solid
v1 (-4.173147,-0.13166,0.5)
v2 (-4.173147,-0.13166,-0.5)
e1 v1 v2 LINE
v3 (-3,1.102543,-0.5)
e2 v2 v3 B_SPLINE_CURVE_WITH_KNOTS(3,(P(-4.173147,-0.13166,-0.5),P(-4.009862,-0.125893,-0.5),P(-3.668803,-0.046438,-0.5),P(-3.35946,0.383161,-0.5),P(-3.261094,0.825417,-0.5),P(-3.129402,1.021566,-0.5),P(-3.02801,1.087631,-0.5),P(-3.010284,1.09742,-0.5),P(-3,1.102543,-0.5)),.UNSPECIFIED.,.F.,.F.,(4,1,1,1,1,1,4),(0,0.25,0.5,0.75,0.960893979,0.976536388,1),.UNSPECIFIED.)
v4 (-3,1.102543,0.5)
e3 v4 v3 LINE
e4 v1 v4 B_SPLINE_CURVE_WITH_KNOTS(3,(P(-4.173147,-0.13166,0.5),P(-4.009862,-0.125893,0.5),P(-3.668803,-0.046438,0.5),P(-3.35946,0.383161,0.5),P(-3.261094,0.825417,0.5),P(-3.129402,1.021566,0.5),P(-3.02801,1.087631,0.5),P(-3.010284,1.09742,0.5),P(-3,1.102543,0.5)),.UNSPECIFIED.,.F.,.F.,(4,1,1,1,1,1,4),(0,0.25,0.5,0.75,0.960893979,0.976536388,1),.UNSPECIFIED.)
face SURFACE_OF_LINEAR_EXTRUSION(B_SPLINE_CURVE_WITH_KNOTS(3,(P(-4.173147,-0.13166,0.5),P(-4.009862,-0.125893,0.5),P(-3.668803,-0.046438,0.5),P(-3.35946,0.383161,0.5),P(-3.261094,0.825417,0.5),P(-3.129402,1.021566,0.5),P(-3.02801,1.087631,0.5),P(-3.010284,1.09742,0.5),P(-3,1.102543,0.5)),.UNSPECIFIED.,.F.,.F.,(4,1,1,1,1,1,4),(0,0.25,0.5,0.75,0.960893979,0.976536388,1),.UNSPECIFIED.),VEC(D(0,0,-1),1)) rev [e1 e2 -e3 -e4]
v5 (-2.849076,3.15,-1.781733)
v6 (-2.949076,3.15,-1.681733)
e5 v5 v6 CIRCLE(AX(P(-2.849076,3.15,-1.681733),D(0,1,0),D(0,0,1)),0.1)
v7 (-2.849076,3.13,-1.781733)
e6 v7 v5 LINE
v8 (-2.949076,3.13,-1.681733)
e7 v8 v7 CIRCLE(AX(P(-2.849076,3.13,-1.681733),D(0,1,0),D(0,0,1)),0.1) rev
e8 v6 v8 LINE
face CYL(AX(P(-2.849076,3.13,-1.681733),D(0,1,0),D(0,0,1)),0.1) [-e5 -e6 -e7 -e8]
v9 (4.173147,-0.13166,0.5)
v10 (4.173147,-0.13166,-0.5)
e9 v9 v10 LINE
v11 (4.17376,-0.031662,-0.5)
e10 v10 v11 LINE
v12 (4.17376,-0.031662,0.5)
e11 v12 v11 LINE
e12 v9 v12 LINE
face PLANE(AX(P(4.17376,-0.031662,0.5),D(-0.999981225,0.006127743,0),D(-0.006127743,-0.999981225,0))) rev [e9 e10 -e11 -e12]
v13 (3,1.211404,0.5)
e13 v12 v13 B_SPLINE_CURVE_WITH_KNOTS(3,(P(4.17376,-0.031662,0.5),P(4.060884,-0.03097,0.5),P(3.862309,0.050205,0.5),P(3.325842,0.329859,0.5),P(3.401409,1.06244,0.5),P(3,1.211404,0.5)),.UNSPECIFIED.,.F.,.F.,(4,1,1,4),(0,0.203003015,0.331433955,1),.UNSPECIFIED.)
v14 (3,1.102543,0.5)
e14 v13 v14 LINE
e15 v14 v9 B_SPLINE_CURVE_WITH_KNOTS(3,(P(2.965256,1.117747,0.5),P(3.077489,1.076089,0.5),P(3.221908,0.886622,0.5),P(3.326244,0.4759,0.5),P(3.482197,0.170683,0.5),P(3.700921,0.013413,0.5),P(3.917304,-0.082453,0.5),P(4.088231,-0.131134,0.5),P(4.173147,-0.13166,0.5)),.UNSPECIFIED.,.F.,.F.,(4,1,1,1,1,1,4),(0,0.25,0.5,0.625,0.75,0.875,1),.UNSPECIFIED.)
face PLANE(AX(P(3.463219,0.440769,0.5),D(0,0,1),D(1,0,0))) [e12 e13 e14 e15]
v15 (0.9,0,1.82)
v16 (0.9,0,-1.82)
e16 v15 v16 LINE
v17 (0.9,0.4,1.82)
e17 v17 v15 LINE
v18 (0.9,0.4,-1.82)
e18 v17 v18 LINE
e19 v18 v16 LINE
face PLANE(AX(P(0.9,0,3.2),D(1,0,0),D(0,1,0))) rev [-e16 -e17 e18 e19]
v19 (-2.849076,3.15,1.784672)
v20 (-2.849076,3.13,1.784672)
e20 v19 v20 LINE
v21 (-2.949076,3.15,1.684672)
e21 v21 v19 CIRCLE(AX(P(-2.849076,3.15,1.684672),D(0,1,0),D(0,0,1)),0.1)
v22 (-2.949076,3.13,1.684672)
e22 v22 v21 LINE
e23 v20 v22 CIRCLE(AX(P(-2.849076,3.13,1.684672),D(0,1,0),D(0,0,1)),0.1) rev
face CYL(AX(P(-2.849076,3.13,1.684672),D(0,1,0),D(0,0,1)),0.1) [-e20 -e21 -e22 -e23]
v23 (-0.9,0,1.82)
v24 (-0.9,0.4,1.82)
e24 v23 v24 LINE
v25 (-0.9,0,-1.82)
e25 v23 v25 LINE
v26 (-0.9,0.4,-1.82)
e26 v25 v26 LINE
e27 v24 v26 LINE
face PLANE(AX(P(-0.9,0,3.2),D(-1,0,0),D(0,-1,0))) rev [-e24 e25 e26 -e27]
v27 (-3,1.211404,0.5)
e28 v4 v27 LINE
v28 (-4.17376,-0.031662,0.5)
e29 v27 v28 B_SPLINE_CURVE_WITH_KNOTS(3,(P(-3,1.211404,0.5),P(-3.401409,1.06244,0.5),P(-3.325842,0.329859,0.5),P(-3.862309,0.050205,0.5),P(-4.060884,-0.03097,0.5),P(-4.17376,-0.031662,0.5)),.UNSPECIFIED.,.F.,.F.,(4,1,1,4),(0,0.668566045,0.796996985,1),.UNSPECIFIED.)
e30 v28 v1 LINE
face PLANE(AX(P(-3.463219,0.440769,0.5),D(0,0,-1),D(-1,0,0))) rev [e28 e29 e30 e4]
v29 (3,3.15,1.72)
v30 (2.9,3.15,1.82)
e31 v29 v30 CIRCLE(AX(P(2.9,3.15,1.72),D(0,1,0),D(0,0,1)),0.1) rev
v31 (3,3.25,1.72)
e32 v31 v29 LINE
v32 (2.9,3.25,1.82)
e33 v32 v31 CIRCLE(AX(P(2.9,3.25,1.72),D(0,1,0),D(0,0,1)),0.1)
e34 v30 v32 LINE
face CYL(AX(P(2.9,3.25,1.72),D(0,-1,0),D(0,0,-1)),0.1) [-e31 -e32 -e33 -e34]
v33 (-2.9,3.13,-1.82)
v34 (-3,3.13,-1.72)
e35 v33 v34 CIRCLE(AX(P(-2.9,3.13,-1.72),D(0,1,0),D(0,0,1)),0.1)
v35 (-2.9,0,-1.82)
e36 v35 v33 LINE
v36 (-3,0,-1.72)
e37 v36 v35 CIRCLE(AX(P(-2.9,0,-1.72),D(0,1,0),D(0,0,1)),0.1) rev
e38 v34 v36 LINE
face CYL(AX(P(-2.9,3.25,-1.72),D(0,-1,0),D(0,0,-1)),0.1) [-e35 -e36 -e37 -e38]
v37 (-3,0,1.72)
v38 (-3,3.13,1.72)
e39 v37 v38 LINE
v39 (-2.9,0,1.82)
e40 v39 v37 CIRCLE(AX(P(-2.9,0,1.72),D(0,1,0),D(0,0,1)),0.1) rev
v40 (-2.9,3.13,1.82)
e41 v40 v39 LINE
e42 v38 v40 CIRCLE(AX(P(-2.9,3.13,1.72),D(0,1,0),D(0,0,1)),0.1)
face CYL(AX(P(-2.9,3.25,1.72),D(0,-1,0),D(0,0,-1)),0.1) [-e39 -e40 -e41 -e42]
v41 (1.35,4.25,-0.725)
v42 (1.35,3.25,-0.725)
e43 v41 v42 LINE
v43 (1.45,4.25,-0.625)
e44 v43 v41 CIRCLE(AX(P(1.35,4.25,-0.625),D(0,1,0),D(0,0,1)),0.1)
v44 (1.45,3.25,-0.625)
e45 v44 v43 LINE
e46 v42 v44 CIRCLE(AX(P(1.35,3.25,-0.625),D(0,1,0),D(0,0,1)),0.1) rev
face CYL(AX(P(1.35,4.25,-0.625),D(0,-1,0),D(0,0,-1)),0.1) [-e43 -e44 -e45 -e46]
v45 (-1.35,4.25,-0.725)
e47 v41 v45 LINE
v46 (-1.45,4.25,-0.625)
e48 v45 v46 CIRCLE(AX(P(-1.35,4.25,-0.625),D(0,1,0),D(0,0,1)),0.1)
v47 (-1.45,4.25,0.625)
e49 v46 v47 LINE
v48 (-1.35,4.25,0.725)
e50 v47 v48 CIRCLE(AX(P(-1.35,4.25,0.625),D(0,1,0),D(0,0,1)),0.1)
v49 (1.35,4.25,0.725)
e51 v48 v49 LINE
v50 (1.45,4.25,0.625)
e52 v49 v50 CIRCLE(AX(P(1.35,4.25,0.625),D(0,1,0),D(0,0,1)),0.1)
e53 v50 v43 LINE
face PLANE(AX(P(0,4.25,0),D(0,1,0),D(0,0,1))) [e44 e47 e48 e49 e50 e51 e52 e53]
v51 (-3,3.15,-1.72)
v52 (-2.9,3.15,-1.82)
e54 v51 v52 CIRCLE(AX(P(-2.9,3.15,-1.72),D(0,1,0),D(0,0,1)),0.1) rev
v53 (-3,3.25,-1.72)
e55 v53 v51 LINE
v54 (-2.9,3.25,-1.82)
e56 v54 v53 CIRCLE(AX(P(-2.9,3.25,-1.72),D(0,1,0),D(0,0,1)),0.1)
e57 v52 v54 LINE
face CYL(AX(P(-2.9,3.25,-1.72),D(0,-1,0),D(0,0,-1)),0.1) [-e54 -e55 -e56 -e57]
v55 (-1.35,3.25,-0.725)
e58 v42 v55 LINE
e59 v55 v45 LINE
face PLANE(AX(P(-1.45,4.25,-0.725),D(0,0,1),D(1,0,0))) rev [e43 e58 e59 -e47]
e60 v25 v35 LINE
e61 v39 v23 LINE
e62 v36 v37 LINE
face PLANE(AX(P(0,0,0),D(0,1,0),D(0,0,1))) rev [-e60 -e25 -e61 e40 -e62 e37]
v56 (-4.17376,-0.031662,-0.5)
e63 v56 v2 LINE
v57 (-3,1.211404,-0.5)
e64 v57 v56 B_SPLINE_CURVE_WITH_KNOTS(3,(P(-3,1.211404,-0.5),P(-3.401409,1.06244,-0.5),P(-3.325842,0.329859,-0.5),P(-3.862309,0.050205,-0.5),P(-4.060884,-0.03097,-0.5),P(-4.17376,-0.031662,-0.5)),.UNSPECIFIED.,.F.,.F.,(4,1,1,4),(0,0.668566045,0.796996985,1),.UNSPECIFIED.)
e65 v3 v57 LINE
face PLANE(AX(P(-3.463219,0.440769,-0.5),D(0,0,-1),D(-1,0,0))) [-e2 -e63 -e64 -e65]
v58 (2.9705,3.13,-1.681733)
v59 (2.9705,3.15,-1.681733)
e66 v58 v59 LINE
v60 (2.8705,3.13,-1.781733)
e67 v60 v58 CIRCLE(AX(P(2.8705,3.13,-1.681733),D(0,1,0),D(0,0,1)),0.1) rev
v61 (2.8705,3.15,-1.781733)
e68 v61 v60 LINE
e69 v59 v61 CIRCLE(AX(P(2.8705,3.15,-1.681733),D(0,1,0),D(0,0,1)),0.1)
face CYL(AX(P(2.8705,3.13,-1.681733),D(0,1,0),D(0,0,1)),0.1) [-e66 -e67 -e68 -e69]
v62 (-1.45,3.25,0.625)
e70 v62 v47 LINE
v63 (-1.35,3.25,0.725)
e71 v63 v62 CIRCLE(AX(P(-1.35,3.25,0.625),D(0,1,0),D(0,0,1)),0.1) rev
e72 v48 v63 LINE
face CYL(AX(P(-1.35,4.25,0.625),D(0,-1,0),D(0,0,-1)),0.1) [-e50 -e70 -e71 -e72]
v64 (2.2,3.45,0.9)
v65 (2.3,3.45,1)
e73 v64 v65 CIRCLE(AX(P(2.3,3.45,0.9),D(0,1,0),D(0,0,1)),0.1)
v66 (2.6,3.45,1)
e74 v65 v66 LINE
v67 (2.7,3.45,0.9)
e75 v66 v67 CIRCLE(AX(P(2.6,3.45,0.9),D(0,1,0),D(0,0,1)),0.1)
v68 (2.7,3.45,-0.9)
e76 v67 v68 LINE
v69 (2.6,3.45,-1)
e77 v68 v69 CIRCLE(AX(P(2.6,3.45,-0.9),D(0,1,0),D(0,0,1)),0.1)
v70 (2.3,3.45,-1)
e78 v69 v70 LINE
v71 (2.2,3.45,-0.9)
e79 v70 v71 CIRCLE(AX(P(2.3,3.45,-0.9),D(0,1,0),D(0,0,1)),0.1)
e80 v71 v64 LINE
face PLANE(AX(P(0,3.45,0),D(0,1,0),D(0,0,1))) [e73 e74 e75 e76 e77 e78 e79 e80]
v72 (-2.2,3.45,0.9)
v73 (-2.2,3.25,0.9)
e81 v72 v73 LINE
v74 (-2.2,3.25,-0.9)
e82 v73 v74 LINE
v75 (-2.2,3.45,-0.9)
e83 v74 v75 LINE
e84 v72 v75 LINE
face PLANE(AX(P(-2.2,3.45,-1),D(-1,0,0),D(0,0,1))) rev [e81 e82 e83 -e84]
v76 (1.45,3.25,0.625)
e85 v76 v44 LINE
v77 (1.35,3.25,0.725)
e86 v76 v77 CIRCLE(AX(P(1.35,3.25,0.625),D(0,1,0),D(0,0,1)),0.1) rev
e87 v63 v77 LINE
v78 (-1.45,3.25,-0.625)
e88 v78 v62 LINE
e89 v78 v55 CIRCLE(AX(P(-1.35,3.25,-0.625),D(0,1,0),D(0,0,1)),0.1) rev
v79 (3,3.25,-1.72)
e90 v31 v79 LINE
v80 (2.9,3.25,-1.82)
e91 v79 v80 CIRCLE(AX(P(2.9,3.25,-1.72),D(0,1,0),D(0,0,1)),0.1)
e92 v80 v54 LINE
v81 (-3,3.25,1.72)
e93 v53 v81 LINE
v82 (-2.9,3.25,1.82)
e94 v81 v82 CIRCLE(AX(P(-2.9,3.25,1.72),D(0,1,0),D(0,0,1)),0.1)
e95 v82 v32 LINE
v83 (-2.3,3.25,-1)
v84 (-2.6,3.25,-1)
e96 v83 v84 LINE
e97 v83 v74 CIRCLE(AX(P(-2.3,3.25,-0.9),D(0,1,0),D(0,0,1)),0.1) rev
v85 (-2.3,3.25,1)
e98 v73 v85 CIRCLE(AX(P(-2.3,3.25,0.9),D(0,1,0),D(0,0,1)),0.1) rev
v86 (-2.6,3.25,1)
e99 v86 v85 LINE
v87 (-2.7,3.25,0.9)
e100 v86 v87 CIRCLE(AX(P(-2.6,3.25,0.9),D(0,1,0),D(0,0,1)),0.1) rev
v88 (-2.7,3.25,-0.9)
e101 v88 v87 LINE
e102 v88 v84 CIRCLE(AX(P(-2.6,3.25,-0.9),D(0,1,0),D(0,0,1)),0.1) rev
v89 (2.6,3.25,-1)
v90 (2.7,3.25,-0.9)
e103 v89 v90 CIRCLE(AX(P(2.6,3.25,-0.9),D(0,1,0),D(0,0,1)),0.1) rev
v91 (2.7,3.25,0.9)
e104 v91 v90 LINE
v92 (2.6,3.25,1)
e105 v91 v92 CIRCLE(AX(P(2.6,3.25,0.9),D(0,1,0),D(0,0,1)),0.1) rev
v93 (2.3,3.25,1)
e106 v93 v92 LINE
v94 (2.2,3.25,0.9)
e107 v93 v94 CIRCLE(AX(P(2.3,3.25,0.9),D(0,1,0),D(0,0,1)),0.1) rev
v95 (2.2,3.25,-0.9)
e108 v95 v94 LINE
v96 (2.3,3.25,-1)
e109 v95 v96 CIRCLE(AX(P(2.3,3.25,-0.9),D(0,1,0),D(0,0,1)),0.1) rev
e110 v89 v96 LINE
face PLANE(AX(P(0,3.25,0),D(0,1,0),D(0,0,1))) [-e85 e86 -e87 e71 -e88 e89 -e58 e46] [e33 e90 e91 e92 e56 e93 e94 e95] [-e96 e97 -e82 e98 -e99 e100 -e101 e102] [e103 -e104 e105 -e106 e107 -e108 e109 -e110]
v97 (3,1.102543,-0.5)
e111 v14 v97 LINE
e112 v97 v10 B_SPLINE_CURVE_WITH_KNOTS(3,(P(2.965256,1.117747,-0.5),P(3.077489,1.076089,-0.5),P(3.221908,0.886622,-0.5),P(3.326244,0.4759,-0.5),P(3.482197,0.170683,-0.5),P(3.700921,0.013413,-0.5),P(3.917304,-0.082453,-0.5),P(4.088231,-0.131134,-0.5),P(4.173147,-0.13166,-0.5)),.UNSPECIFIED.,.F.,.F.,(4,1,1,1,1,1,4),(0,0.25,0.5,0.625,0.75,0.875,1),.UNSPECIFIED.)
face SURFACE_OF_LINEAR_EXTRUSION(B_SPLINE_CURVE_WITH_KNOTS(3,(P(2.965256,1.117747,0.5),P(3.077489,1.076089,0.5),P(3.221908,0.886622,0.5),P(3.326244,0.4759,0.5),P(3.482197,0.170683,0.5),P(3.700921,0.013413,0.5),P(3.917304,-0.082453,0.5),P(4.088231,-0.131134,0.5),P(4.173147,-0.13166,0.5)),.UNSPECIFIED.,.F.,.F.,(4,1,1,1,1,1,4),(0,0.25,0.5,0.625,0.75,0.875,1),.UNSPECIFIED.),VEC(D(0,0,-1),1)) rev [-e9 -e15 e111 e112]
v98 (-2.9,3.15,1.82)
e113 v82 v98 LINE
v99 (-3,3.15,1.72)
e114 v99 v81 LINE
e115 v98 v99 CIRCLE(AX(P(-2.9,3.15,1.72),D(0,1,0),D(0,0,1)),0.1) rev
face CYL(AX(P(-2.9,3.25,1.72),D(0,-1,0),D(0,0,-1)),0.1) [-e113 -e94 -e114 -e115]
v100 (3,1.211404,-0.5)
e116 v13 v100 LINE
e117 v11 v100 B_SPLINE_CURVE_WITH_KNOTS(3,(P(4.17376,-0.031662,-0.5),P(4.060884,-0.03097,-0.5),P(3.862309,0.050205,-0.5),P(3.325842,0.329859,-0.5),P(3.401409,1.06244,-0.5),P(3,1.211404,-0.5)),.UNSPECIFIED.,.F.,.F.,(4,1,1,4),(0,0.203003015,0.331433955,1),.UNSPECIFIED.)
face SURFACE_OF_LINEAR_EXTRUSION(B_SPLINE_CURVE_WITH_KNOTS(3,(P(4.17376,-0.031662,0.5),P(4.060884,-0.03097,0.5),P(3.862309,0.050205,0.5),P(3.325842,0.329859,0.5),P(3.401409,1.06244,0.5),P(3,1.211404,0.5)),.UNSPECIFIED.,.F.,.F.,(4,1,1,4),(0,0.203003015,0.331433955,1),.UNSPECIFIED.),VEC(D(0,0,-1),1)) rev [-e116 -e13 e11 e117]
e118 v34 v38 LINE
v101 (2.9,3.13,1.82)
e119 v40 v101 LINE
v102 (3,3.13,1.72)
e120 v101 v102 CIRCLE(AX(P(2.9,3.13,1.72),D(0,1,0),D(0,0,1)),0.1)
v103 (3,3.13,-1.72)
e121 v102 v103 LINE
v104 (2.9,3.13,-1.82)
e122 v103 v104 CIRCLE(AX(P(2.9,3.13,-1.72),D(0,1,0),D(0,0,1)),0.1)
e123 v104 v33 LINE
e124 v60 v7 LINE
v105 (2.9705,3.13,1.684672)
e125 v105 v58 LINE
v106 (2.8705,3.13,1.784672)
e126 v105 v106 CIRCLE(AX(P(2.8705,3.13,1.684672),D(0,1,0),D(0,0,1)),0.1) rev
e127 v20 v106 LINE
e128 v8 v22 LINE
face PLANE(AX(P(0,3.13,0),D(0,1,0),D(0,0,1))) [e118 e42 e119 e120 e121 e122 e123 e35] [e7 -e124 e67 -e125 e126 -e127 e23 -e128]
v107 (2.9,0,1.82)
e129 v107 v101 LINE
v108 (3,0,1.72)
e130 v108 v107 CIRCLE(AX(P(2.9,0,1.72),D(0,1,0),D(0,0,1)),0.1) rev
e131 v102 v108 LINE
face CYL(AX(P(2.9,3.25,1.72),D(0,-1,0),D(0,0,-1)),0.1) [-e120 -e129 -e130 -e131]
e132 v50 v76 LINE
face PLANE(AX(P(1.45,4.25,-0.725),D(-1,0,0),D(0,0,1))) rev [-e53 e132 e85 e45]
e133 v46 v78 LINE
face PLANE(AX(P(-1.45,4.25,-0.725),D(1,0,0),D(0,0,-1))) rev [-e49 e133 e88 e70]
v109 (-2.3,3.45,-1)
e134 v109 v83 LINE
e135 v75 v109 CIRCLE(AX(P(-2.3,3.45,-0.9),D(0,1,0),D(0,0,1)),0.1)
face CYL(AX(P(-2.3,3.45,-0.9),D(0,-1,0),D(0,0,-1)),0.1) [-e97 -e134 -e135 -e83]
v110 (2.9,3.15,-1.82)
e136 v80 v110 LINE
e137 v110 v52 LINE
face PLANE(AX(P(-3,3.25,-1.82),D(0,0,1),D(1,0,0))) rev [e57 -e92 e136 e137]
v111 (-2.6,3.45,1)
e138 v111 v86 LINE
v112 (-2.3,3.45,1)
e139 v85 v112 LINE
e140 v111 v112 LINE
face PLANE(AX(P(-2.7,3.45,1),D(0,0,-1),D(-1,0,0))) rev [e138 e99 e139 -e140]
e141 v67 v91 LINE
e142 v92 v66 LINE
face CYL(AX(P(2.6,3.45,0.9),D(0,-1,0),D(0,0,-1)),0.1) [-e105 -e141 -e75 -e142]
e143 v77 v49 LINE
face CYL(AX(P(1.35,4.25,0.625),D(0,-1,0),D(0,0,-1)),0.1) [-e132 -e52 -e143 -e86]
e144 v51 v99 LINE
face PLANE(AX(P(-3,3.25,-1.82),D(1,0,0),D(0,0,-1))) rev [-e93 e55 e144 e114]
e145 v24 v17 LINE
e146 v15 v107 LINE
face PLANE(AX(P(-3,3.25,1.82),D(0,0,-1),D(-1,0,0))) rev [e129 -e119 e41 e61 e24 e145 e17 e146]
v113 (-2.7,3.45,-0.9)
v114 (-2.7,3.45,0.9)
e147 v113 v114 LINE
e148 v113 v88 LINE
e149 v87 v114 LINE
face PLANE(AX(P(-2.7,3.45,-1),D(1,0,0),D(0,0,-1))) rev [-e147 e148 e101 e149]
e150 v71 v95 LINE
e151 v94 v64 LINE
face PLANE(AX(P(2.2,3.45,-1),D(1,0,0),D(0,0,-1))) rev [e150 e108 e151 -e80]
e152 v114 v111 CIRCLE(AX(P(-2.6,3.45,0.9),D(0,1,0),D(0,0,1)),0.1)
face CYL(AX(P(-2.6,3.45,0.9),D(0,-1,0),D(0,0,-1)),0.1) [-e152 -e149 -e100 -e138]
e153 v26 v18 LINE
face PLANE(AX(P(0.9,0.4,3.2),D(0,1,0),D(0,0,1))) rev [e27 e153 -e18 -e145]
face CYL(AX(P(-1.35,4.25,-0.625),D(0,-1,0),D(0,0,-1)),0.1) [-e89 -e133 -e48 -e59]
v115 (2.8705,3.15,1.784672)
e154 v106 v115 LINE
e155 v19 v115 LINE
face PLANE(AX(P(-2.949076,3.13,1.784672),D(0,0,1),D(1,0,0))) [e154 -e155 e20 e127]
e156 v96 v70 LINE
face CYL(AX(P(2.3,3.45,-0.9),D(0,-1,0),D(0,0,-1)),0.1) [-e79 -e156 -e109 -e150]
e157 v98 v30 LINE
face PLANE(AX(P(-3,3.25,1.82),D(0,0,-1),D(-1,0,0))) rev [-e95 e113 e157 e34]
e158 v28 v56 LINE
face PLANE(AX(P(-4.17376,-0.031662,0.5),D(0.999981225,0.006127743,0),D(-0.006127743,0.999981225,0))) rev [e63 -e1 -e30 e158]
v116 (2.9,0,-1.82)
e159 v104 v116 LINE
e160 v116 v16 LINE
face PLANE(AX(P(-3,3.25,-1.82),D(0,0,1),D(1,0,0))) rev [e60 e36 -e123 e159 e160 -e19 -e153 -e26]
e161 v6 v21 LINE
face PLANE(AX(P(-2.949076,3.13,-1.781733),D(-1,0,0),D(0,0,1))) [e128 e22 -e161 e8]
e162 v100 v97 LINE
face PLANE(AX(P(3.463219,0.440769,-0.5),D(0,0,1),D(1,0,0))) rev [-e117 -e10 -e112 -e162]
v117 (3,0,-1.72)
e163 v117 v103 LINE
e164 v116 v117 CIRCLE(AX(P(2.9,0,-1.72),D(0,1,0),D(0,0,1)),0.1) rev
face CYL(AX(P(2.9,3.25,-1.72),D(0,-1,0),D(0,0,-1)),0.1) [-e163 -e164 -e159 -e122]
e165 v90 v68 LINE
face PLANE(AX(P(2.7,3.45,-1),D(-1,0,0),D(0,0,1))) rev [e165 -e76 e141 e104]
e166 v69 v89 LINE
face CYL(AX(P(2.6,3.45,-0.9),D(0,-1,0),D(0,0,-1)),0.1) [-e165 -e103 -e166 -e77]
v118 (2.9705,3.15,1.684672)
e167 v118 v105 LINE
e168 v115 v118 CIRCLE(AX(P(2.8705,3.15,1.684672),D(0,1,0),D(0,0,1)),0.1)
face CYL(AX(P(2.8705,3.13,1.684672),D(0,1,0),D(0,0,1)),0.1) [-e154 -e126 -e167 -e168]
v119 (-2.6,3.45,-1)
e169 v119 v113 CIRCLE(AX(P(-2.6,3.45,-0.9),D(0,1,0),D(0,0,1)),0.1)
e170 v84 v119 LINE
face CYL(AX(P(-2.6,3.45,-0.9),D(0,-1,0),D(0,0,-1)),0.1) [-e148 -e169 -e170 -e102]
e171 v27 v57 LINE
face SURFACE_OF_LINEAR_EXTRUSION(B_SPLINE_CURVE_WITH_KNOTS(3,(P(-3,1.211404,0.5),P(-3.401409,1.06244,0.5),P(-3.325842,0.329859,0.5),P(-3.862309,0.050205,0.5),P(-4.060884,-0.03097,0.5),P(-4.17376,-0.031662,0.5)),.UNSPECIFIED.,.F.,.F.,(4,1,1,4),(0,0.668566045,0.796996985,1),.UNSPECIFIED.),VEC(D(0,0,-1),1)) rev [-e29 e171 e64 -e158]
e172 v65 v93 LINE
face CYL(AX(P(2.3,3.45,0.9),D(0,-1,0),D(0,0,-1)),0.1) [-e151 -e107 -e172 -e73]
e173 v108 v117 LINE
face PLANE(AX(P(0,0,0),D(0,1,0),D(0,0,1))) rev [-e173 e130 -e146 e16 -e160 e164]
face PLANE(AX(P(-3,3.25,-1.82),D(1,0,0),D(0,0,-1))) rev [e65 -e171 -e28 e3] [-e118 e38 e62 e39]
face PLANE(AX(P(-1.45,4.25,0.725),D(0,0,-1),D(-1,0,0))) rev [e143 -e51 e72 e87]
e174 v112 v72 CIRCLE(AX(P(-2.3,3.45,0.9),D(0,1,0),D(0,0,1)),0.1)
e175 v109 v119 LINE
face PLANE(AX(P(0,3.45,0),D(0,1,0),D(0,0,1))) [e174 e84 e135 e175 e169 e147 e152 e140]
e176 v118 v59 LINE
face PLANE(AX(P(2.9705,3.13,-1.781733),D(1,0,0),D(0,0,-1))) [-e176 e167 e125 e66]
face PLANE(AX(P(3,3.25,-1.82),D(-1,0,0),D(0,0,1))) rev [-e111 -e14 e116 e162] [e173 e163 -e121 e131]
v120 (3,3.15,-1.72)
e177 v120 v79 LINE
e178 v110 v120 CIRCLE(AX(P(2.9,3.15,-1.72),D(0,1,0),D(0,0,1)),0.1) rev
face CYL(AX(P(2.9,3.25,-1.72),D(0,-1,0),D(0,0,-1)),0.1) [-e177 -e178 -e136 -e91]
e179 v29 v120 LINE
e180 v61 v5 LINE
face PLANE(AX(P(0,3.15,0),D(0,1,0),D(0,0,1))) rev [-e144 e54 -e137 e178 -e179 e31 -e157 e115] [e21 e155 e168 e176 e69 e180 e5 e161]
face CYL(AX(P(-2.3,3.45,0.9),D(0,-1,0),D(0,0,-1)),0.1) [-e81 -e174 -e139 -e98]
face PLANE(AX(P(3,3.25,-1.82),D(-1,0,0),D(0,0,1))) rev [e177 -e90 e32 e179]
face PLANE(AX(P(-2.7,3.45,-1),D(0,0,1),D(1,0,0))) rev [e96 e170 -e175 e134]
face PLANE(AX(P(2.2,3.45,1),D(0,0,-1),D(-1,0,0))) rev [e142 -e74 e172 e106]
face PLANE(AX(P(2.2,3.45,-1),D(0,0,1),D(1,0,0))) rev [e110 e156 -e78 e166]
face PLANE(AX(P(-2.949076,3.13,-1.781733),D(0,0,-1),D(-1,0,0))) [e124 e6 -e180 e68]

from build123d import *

# Parameters (mm, degrees)
SKETCH1_W           = 6
SKETCH1_H           = 3.64
BOSS_EXTRUDE1_DEPTH = 3.25
SKETCH2_W           = 2.9
SKETCH2_H           = 1.45
BOSS_EXTRUDE2_DEPTH = 1
SKETCH3_W           = 0.5
SKETCH3_H           = 2
BOSS_EXTRUDE3_DEPTH = 0.2
FILLET1_R           = 0.1
SKETCH4_W           = 6.273612193
SKETCH4_H           = 3.809222638
SKETCH4_W_2         = 5.919575883
SKETCH4_H_2         = 3.566405206
CUT_EXTRUDE1_DEPTH  = 0.02
FILLET2_R           = 0.1
SKETCH5_W           = 1.8
SKETCH5_H           = 0.4
CUT_EXTRUDE2_DEPTH  = 5.02
BOSS_EXTRUDE4_START = -0.5
BOSS_EXTRUDE4_DEPTH = 1


# Read off the part's stored shape, not the designer's step: Boss-Extrude4
with BuildPart() as part:
    # Sketch1 → Boss-Extrude1 (new body)
    with BuildSketch(Plane(origin=(0, 0, 0), x_dir=(1, 0, 0), z_dir=(0, 1, 0))):
        Rectangle(SKETCH1_W, SKETCH1_H)
    extrude(amount=BOSS_EXTRUDE1_DEPTH)

    # Sketch2 → Boss-Extrude2 (add)
    with BuildSketch(Plane(origin=(0, 3.25, 0), x_dir=(1, 0, 0), z_dir=(0, 1, 0))):
        Rectangle(SKETCH2_W, SKETCH2_H)
    extrude(amount=BOSS_EXTRUDE2_DEPTH)

    # Sketch3 → Boss-Extrude3 (add)
    with BuildSketch(Plane(origin=(0, 3.25, 0), x_dir=(1, 0, 0), z_dir=(0, 1, 0))):
        with Locations((-2.45, 0)):
            Rectangle(SKETCH3_W, SKETCH3_H)
        with Locations((2.45, 0)):
            Rectangle(SKETCH3_W, SKETCH3_H)
    extrude(amount=BOSS_EXTRUDE3_DEPTH)

    # Fillet1
    fillet1_edges = [part.edges().sort_by_distance(p)[0] for p in [
        (-1.45, 3.75, -0.725),
        (-1.45, 3.75, 0.725),
        (1.45, 3.75, 0.725),
        (1.45, 3.75, -0.725),
        (-2.7, 3.35, -1),
        (-2.7, 3.35, 1),
        (-2.2, 3.35, 1),
        (-2.2, 3.35, -1),
        (2.2, 3.35, -1),
        (2.2, 3.35, 1),
        (2.7, 3.35, 1),
        (2.7, 3.35, -1),
    ]]
    fillet(fillet1_edges, radius=FILLET1_R)

    # Sketch4 → Cut-Extrude1 (cut)
    with BuildSketch(Plane(origin=(0, 3.15, 0), x_dir=(1, 0, 0), z_dir=(0, 1, 0))):
        with Locations((-0.037546102, -0.013653128)):
            Rectangle(SKETCH4_W, SKETCH4_H)
        with Locations((0.010712352, -0.001469434)):
            Rectangle(SKETCH4_W_2, SKETCH4_H_2, mode=Mode.SUBTRACT)
    extrude(amount=-CUT_EXTRUDE1_DEPTH, mode=Mode.SUBTRACT)

    # Fillet2
    fillet2_edges = [part.edges().sort_by_distance(p)[0] for p in [
        (-3, 1.565, -1.82),
        (3, 1.565, -1.82),
        (3, 1.565, 1.82),
        (-3, 1.565, 1.82),
        (-2.94907559, 3.14, -1.781733169),
        (2.970500293, 3.14, -1.781733169),
        (2.970500293, 3.14, 1.784672037),
        (-2.94907559, 3.14, 1.784672037),
        (-3, 3.2, -1.82),
        (3, 3.2, -1.82),
        (3, 3.2, 1.82),
        (-3, 3.2, 1.82),
    ]]
    fillet(fillet2_edges, radius=FILLET2_R)

    # Sketch5 → Cut-Extrude2 (cut)
    with BuildSketch(Plane(origin=(0, 0, -1.82), x_dir=(-1, 0, 0), z_dir=(0, 0, -1))):
        with Locations((0, 0.2)):
            Rectangle(SKETCH5_W, SKETCH5_H)
    extrude(amount=-CUT_EXTRUDE2_DEPTH, mode=Mode.SUBTRACT)

    # Boss-Extrude4 outline → Boss-Extrude4 (add)
    with BuildSketch(Plane.XY.offset(BOSS_EXTRUDE4_START)):
        with BuildLine():
            Line((4.173146956, -0.131659711), (4.173759731, -0.031661589))
            add(Edge.make_bspline(
                [(4.173759731, -0.031661589), (4.060884449, -0.030969905), (3.862308969, 0.050205488), (3.325841553, 0.329858602), (3.401409137, 1.062439588), (3, 1.211404175)],
                knots=[0, 0, 0, 0, 0.203003015, 0.331433955, 1, 1, 1, 1], degree=3))
            Line((3, 1.211404175), (3, 1.102542921))
            add(Edge.make_bspline(
                [(3, 1.102542921), (3.09279535, 1.055379151), (3.226381881, 0.869010627), (3.326243834, 0.475899683), (3.482197094, 0.170683307), (3.700920866, 0.013413394), (3.917304218, -0.082452634), (4.088231211, -0.131134455), (4.173146956, -0.131659711)],
                knots=[0.026799616, 0.026799616, 0.026799616, 0.026799616, 0.25, 0.5, 0.625, 0.75, 0.875, 1, 1, 1, 1], degree=3))
        make_face()
        with BuildLine():
            Line((-3, 1.102542921), (-3, 1.211404175))
            add(Edge.make_bspline(
                [(-3, 1.211404175), (-3.401409137, 1.062439588), (-3.325841553, 0.329858602), (-3.862308969, 0.050205488), (-4.060884449, -0.030969905), (-4.173759731, -0.031661589)],
                knots=[0, 0, 0, 0, 0.668566045, 0.796996985, 1, 1, 1, 1], degree=3))
            Line((-4.173759731, -0.031661589), (-4.173146956, -0.131659711))
            add(Edge.make_bspline(
                [(-4.173146956, -0.131659711), (-4.009862358, -0.125892663), (-3.668802958, -0.046437584), (-3.359459873, 0.383160744), (-3.261093668, 0.825417205), (-3.129401541, 1.021566363), (-3.02801046, 1.087631493), (-3.010284263, 1.097420299), (-3, 1.102542921)],
                knots=[0, 0, 0, 0, 0.25, 0.5, 0.75, 0.960893979, 0.976536388, 1, 1, 1, 1], degree=3))
        make_face()
    extrude(amount=BOSS_EXTRUDE4_DEPTH)


solid = part.part
